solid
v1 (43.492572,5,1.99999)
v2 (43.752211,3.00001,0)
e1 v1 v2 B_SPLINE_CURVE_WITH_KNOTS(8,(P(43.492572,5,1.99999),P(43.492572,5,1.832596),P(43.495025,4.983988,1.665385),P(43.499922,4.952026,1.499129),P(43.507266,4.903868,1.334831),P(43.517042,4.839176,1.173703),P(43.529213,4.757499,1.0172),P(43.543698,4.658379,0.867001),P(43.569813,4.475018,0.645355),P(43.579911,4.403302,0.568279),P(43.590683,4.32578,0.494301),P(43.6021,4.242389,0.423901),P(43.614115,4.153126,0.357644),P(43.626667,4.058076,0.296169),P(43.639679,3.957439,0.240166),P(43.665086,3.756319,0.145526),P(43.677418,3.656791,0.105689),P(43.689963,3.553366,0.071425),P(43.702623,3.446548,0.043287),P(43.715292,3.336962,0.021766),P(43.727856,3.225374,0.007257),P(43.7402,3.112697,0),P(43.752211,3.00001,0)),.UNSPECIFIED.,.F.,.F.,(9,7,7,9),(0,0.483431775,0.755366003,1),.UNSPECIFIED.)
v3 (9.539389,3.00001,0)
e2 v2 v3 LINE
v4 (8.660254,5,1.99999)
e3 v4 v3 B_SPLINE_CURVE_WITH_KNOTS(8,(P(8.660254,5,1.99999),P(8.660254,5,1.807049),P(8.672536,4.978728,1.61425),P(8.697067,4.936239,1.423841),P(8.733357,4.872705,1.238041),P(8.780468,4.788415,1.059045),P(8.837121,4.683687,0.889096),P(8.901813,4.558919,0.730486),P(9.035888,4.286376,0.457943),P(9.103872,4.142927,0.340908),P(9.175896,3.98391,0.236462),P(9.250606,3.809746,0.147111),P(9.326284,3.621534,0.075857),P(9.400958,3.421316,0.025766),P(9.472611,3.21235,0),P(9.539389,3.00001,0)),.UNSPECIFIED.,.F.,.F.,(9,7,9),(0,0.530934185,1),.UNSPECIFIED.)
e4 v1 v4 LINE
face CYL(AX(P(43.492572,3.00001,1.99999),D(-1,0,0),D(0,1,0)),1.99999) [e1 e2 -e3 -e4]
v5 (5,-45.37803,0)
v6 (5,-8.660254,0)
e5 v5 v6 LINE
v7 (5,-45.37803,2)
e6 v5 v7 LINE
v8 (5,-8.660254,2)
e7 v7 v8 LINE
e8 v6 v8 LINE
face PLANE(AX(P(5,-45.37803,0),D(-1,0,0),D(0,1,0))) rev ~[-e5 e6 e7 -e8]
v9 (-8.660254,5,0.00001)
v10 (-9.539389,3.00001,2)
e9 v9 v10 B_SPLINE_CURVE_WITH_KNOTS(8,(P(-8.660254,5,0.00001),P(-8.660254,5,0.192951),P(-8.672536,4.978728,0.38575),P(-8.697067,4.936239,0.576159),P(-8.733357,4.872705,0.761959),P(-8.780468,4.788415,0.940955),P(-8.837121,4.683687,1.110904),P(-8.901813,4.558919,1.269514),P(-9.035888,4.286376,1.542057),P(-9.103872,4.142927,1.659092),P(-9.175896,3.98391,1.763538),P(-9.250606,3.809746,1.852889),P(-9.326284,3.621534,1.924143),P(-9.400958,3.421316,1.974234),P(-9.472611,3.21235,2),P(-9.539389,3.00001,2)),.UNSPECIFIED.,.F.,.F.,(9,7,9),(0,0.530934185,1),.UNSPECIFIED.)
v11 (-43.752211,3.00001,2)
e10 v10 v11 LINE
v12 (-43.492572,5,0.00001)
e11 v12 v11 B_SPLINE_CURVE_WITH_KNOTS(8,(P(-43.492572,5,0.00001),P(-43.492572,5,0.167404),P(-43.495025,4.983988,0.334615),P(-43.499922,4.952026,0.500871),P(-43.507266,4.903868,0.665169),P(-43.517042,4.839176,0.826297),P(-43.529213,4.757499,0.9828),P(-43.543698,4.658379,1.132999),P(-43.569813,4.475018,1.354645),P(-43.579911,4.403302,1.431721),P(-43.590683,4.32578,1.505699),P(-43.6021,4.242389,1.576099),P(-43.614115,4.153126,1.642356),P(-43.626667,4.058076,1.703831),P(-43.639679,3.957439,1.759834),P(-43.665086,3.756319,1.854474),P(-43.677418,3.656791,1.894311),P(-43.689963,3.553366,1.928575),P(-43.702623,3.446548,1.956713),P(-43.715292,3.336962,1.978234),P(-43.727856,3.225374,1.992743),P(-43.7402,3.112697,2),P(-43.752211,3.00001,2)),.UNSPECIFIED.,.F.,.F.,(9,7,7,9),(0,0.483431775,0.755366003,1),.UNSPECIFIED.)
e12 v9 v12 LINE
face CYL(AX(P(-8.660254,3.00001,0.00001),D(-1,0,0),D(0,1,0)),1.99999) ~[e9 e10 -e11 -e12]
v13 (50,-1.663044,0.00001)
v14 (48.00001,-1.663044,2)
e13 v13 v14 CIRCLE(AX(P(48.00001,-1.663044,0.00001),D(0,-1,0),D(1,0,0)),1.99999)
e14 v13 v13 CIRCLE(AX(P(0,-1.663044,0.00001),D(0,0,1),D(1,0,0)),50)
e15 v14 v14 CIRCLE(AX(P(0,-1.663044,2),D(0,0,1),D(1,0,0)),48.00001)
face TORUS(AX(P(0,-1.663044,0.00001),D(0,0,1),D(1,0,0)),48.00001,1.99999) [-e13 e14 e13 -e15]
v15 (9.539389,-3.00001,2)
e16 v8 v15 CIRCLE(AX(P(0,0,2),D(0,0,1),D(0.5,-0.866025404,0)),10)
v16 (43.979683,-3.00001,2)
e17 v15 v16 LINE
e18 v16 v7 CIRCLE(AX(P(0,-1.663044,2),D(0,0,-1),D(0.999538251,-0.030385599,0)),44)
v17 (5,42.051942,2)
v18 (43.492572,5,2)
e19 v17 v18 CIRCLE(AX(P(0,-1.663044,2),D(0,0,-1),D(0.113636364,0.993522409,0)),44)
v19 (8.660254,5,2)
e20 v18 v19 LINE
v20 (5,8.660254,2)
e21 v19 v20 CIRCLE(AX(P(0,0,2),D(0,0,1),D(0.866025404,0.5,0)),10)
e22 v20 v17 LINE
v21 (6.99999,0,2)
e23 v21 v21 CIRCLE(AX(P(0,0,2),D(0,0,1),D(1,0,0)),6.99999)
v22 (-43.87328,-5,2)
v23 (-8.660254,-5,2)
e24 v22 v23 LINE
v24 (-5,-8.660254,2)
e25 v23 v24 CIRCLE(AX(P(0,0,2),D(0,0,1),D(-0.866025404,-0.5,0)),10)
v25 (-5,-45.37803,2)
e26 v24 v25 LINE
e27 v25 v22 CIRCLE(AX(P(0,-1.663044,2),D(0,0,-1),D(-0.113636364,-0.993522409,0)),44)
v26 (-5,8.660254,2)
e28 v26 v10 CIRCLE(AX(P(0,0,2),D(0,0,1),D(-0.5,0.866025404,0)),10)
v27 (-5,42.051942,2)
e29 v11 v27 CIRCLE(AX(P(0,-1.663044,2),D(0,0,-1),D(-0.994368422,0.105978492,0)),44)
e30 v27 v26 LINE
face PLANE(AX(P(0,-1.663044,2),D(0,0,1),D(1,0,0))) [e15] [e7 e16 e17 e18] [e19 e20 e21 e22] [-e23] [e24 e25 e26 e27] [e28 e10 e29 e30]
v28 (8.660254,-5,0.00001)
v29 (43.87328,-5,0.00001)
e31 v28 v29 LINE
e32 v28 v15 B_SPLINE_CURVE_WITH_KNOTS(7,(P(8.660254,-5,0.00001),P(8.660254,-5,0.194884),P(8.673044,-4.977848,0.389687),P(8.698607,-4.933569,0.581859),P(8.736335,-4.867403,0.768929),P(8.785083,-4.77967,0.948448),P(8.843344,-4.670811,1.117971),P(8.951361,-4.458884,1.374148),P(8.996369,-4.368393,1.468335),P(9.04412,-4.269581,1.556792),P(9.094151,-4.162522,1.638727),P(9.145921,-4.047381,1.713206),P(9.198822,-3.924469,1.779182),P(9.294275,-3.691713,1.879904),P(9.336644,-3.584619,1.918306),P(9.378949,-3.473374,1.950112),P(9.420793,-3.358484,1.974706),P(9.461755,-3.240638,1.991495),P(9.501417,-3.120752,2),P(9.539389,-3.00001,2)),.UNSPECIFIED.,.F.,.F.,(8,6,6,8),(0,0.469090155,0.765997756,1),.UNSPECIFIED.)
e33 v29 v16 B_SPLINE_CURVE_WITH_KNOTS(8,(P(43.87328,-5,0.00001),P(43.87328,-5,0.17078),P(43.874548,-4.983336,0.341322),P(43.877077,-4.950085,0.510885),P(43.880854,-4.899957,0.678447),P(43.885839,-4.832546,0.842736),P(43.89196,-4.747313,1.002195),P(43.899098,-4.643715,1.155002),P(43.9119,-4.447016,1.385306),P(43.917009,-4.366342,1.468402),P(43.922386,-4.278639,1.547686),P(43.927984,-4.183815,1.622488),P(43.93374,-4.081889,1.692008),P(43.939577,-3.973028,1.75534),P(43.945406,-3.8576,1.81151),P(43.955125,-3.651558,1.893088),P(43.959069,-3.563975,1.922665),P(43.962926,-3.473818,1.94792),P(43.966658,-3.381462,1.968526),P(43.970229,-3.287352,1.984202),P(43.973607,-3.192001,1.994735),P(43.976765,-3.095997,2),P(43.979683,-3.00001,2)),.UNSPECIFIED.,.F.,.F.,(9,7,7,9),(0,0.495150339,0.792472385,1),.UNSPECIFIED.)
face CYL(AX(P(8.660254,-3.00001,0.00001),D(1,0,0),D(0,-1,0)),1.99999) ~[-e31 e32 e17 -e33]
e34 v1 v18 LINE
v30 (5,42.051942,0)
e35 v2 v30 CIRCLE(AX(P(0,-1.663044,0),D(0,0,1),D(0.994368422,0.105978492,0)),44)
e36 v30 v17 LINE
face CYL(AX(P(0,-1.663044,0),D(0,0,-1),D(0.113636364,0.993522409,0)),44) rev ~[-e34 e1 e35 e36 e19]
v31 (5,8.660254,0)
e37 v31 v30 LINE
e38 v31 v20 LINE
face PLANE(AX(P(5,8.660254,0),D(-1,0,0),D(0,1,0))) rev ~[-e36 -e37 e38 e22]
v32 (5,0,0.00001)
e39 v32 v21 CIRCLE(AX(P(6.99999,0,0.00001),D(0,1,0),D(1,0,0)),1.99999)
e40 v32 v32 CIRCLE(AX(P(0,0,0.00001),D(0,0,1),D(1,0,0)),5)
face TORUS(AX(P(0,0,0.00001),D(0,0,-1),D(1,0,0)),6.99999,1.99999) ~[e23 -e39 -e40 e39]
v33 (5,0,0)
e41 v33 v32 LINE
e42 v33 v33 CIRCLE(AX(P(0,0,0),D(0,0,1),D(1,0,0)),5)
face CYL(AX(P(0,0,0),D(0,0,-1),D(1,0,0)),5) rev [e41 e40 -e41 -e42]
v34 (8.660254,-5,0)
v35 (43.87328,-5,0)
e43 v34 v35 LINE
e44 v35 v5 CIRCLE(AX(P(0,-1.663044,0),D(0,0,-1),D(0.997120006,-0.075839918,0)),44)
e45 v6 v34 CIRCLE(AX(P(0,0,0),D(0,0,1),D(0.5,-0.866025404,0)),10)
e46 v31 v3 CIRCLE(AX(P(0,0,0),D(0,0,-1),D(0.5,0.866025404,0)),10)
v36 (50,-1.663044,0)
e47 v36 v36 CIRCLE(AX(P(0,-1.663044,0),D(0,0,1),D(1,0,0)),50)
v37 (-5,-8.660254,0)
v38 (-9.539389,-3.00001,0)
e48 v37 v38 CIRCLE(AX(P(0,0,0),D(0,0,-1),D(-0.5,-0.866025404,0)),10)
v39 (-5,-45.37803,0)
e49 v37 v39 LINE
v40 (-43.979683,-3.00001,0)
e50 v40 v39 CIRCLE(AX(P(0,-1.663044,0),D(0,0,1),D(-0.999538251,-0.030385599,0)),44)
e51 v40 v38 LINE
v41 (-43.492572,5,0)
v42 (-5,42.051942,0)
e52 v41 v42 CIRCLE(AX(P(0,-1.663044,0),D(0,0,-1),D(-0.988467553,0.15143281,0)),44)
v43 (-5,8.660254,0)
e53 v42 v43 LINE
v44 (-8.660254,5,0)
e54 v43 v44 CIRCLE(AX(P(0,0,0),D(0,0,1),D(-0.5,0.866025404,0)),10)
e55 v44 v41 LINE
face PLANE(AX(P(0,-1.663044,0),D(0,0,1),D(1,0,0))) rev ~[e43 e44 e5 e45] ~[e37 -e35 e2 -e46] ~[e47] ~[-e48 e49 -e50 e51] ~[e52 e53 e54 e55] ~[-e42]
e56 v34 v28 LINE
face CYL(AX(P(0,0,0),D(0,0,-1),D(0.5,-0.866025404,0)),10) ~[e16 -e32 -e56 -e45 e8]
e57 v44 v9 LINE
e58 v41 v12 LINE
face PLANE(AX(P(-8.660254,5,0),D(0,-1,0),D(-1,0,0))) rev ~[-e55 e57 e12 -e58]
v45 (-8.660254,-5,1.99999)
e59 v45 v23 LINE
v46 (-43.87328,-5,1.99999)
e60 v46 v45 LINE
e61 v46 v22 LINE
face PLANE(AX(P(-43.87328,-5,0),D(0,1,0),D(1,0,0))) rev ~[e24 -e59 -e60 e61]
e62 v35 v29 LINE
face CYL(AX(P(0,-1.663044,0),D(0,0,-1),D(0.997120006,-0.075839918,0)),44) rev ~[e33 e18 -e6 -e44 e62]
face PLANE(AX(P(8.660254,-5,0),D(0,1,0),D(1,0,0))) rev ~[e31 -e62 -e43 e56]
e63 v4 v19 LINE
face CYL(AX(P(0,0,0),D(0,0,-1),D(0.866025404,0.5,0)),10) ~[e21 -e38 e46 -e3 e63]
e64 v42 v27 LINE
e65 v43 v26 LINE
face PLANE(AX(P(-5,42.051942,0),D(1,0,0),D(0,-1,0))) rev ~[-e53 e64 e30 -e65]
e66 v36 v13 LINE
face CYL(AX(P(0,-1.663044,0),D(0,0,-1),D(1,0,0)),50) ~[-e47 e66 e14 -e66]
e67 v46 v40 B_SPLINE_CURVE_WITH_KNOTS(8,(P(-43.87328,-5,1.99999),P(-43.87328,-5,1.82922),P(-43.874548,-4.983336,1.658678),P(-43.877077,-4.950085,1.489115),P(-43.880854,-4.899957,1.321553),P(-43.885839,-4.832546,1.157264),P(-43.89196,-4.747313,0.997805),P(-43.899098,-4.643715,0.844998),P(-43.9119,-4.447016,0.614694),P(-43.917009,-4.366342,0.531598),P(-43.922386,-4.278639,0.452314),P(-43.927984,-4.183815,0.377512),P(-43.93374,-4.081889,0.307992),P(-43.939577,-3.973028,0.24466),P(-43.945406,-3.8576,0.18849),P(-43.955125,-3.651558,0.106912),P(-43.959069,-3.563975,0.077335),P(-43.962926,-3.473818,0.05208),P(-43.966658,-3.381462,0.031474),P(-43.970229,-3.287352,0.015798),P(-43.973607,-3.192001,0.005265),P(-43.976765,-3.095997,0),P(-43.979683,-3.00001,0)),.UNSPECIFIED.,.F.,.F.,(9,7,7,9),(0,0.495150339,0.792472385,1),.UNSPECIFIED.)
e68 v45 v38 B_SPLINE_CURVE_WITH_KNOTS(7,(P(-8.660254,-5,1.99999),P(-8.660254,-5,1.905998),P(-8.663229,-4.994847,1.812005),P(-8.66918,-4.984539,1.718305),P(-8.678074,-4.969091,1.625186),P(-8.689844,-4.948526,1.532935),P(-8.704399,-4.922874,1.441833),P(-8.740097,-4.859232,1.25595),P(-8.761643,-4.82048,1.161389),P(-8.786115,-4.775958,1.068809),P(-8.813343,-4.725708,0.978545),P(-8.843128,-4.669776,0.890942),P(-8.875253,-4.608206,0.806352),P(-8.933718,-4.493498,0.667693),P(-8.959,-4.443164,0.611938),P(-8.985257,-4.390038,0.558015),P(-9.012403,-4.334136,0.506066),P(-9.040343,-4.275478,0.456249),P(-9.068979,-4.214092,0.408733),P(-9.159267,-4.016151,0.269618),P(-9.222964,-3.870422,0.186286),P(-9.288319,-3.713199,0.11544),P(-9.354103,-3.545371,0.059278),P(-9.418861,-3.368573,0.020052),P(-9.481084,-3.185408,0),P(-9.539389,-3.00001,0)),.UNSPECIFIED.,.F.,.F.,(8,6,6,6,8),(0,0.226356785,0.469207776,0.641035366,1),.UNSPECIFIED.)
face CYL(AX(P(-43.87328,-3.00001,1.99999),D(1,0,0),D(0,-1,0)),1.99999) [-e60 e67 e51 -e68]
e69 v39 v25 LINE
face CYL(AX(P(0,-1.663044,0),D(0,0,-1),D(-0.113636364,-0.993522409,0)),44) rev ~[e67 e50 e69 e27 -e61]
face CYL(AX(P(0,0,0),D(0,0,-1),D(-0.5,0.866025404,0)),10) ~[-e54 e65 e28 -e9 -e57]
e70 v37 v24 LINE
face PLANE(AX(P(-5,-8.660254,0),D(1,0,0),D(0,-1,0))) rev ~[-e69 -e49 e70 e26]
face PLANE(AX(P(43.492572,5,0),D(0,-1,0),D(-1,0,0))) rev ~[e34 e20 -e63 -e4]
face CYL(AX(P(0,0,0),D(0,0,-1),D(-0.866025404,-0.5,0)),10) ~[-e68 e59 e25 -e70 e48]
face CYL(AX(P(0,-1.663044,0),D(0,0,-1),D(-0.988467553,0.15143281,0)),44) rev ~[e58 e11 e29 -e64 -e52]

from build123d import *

# Parameters (mm, degrees)
F0_R     = 50
F0_R_2   = 5
F1_DEPTH = 2
F2_R     = 1.99999


# Not quite as in the source:
# - a fillet or chamfer is up to 0.001 mm smaller than in the source, because OpenCascade refuses the exact size


with BuildPart() as f1:
    # F0 (on Top) → F1 (new body)
    with BuildSketch(Plane.XY):
        with Locations((0, -1.6630436294)):
            Circle(F0_R)
        with BuildLine():
            ThreePointArc((-5, -45.3780296182), (-31.6977238962, -32.1795031194), (-43.873280276, -5))
            Line((-43.873280276, -5), (-8.6602540378, -5))
            ThreePointArc((-8.6602540378, -5), (-7.0710678119, -7.0710678119), (-5, -8.6602540378))
            Line((-5, -8.6602540378), (-5, -45.3780296182))
        make_face(mode=Mode.SUBTRACT)
        with BuildLine():
            ThreePointArc((5, -8.6602540378), (7.0710678119, -7.0710678119), (8.6602540378, -5))
            Line((8.6602540378, -5), (43.873280276, -5))
            ThreePointArc((43.873280276, -5), (31.6977238962, -32.1795031194), (5, -45.3780296182))
            Line((5, -45.3780296182), (5, -8.6602540378))
        make_face(mode=Mode.SUBTRACT)
        with BuildLine():
            ThreePointArc((-43.4925723497, 5), (-30.513832952, 30.0372087131), (-5, 42.0519423594))
            Line((-5, 42.0519423594), (-5, 8.6602540378))
            ThreePointArc((-5, 8.6602540378), (-7.0710678119, 7.0710678119), (-8.6602540378, 5))
            Line((-8.6602540378, 5), (-43.4925723497, 5))
        make_face(mode=Mode.SUBTRACT)
        Circle(F0_R_2, mode=Mode.SUBTRACT)
        with BuildLine():
            Line((43.4925723497, 5), (8.6602540378, 5))
            ThreePointArc((8.6602540378, 5), (7.0710678119, 7.0710678119), (5, 8.6602540378))
            Line((5, 8.6602540378), (5, 42.0519423594))
            ThreePointArc((5, 42.0519423594), (30.513832952, 30.0372087131), (43.4925723497, 5))
        make_face(mode=Mode.SUBTRACT)
    extrude(amount=F1_DEPTH)

    # F2 (radius 2 in the source; OpenCascade refuses exactly that, so slightly less here)
    f2_edges = [f1.edges().sort_by_distance(p)[0] for p in [
        (-50, -1.663044, 2),
        (26.076413, 5, 0),
        (-26.266767, -5, 0),
        (-26.076413, 5, 2),
        (26.266767, -5, 2),
        (-5, 0, 2),
    ]]
    fillet(f2_edges, radius=F2_R)


solid = f1.part
